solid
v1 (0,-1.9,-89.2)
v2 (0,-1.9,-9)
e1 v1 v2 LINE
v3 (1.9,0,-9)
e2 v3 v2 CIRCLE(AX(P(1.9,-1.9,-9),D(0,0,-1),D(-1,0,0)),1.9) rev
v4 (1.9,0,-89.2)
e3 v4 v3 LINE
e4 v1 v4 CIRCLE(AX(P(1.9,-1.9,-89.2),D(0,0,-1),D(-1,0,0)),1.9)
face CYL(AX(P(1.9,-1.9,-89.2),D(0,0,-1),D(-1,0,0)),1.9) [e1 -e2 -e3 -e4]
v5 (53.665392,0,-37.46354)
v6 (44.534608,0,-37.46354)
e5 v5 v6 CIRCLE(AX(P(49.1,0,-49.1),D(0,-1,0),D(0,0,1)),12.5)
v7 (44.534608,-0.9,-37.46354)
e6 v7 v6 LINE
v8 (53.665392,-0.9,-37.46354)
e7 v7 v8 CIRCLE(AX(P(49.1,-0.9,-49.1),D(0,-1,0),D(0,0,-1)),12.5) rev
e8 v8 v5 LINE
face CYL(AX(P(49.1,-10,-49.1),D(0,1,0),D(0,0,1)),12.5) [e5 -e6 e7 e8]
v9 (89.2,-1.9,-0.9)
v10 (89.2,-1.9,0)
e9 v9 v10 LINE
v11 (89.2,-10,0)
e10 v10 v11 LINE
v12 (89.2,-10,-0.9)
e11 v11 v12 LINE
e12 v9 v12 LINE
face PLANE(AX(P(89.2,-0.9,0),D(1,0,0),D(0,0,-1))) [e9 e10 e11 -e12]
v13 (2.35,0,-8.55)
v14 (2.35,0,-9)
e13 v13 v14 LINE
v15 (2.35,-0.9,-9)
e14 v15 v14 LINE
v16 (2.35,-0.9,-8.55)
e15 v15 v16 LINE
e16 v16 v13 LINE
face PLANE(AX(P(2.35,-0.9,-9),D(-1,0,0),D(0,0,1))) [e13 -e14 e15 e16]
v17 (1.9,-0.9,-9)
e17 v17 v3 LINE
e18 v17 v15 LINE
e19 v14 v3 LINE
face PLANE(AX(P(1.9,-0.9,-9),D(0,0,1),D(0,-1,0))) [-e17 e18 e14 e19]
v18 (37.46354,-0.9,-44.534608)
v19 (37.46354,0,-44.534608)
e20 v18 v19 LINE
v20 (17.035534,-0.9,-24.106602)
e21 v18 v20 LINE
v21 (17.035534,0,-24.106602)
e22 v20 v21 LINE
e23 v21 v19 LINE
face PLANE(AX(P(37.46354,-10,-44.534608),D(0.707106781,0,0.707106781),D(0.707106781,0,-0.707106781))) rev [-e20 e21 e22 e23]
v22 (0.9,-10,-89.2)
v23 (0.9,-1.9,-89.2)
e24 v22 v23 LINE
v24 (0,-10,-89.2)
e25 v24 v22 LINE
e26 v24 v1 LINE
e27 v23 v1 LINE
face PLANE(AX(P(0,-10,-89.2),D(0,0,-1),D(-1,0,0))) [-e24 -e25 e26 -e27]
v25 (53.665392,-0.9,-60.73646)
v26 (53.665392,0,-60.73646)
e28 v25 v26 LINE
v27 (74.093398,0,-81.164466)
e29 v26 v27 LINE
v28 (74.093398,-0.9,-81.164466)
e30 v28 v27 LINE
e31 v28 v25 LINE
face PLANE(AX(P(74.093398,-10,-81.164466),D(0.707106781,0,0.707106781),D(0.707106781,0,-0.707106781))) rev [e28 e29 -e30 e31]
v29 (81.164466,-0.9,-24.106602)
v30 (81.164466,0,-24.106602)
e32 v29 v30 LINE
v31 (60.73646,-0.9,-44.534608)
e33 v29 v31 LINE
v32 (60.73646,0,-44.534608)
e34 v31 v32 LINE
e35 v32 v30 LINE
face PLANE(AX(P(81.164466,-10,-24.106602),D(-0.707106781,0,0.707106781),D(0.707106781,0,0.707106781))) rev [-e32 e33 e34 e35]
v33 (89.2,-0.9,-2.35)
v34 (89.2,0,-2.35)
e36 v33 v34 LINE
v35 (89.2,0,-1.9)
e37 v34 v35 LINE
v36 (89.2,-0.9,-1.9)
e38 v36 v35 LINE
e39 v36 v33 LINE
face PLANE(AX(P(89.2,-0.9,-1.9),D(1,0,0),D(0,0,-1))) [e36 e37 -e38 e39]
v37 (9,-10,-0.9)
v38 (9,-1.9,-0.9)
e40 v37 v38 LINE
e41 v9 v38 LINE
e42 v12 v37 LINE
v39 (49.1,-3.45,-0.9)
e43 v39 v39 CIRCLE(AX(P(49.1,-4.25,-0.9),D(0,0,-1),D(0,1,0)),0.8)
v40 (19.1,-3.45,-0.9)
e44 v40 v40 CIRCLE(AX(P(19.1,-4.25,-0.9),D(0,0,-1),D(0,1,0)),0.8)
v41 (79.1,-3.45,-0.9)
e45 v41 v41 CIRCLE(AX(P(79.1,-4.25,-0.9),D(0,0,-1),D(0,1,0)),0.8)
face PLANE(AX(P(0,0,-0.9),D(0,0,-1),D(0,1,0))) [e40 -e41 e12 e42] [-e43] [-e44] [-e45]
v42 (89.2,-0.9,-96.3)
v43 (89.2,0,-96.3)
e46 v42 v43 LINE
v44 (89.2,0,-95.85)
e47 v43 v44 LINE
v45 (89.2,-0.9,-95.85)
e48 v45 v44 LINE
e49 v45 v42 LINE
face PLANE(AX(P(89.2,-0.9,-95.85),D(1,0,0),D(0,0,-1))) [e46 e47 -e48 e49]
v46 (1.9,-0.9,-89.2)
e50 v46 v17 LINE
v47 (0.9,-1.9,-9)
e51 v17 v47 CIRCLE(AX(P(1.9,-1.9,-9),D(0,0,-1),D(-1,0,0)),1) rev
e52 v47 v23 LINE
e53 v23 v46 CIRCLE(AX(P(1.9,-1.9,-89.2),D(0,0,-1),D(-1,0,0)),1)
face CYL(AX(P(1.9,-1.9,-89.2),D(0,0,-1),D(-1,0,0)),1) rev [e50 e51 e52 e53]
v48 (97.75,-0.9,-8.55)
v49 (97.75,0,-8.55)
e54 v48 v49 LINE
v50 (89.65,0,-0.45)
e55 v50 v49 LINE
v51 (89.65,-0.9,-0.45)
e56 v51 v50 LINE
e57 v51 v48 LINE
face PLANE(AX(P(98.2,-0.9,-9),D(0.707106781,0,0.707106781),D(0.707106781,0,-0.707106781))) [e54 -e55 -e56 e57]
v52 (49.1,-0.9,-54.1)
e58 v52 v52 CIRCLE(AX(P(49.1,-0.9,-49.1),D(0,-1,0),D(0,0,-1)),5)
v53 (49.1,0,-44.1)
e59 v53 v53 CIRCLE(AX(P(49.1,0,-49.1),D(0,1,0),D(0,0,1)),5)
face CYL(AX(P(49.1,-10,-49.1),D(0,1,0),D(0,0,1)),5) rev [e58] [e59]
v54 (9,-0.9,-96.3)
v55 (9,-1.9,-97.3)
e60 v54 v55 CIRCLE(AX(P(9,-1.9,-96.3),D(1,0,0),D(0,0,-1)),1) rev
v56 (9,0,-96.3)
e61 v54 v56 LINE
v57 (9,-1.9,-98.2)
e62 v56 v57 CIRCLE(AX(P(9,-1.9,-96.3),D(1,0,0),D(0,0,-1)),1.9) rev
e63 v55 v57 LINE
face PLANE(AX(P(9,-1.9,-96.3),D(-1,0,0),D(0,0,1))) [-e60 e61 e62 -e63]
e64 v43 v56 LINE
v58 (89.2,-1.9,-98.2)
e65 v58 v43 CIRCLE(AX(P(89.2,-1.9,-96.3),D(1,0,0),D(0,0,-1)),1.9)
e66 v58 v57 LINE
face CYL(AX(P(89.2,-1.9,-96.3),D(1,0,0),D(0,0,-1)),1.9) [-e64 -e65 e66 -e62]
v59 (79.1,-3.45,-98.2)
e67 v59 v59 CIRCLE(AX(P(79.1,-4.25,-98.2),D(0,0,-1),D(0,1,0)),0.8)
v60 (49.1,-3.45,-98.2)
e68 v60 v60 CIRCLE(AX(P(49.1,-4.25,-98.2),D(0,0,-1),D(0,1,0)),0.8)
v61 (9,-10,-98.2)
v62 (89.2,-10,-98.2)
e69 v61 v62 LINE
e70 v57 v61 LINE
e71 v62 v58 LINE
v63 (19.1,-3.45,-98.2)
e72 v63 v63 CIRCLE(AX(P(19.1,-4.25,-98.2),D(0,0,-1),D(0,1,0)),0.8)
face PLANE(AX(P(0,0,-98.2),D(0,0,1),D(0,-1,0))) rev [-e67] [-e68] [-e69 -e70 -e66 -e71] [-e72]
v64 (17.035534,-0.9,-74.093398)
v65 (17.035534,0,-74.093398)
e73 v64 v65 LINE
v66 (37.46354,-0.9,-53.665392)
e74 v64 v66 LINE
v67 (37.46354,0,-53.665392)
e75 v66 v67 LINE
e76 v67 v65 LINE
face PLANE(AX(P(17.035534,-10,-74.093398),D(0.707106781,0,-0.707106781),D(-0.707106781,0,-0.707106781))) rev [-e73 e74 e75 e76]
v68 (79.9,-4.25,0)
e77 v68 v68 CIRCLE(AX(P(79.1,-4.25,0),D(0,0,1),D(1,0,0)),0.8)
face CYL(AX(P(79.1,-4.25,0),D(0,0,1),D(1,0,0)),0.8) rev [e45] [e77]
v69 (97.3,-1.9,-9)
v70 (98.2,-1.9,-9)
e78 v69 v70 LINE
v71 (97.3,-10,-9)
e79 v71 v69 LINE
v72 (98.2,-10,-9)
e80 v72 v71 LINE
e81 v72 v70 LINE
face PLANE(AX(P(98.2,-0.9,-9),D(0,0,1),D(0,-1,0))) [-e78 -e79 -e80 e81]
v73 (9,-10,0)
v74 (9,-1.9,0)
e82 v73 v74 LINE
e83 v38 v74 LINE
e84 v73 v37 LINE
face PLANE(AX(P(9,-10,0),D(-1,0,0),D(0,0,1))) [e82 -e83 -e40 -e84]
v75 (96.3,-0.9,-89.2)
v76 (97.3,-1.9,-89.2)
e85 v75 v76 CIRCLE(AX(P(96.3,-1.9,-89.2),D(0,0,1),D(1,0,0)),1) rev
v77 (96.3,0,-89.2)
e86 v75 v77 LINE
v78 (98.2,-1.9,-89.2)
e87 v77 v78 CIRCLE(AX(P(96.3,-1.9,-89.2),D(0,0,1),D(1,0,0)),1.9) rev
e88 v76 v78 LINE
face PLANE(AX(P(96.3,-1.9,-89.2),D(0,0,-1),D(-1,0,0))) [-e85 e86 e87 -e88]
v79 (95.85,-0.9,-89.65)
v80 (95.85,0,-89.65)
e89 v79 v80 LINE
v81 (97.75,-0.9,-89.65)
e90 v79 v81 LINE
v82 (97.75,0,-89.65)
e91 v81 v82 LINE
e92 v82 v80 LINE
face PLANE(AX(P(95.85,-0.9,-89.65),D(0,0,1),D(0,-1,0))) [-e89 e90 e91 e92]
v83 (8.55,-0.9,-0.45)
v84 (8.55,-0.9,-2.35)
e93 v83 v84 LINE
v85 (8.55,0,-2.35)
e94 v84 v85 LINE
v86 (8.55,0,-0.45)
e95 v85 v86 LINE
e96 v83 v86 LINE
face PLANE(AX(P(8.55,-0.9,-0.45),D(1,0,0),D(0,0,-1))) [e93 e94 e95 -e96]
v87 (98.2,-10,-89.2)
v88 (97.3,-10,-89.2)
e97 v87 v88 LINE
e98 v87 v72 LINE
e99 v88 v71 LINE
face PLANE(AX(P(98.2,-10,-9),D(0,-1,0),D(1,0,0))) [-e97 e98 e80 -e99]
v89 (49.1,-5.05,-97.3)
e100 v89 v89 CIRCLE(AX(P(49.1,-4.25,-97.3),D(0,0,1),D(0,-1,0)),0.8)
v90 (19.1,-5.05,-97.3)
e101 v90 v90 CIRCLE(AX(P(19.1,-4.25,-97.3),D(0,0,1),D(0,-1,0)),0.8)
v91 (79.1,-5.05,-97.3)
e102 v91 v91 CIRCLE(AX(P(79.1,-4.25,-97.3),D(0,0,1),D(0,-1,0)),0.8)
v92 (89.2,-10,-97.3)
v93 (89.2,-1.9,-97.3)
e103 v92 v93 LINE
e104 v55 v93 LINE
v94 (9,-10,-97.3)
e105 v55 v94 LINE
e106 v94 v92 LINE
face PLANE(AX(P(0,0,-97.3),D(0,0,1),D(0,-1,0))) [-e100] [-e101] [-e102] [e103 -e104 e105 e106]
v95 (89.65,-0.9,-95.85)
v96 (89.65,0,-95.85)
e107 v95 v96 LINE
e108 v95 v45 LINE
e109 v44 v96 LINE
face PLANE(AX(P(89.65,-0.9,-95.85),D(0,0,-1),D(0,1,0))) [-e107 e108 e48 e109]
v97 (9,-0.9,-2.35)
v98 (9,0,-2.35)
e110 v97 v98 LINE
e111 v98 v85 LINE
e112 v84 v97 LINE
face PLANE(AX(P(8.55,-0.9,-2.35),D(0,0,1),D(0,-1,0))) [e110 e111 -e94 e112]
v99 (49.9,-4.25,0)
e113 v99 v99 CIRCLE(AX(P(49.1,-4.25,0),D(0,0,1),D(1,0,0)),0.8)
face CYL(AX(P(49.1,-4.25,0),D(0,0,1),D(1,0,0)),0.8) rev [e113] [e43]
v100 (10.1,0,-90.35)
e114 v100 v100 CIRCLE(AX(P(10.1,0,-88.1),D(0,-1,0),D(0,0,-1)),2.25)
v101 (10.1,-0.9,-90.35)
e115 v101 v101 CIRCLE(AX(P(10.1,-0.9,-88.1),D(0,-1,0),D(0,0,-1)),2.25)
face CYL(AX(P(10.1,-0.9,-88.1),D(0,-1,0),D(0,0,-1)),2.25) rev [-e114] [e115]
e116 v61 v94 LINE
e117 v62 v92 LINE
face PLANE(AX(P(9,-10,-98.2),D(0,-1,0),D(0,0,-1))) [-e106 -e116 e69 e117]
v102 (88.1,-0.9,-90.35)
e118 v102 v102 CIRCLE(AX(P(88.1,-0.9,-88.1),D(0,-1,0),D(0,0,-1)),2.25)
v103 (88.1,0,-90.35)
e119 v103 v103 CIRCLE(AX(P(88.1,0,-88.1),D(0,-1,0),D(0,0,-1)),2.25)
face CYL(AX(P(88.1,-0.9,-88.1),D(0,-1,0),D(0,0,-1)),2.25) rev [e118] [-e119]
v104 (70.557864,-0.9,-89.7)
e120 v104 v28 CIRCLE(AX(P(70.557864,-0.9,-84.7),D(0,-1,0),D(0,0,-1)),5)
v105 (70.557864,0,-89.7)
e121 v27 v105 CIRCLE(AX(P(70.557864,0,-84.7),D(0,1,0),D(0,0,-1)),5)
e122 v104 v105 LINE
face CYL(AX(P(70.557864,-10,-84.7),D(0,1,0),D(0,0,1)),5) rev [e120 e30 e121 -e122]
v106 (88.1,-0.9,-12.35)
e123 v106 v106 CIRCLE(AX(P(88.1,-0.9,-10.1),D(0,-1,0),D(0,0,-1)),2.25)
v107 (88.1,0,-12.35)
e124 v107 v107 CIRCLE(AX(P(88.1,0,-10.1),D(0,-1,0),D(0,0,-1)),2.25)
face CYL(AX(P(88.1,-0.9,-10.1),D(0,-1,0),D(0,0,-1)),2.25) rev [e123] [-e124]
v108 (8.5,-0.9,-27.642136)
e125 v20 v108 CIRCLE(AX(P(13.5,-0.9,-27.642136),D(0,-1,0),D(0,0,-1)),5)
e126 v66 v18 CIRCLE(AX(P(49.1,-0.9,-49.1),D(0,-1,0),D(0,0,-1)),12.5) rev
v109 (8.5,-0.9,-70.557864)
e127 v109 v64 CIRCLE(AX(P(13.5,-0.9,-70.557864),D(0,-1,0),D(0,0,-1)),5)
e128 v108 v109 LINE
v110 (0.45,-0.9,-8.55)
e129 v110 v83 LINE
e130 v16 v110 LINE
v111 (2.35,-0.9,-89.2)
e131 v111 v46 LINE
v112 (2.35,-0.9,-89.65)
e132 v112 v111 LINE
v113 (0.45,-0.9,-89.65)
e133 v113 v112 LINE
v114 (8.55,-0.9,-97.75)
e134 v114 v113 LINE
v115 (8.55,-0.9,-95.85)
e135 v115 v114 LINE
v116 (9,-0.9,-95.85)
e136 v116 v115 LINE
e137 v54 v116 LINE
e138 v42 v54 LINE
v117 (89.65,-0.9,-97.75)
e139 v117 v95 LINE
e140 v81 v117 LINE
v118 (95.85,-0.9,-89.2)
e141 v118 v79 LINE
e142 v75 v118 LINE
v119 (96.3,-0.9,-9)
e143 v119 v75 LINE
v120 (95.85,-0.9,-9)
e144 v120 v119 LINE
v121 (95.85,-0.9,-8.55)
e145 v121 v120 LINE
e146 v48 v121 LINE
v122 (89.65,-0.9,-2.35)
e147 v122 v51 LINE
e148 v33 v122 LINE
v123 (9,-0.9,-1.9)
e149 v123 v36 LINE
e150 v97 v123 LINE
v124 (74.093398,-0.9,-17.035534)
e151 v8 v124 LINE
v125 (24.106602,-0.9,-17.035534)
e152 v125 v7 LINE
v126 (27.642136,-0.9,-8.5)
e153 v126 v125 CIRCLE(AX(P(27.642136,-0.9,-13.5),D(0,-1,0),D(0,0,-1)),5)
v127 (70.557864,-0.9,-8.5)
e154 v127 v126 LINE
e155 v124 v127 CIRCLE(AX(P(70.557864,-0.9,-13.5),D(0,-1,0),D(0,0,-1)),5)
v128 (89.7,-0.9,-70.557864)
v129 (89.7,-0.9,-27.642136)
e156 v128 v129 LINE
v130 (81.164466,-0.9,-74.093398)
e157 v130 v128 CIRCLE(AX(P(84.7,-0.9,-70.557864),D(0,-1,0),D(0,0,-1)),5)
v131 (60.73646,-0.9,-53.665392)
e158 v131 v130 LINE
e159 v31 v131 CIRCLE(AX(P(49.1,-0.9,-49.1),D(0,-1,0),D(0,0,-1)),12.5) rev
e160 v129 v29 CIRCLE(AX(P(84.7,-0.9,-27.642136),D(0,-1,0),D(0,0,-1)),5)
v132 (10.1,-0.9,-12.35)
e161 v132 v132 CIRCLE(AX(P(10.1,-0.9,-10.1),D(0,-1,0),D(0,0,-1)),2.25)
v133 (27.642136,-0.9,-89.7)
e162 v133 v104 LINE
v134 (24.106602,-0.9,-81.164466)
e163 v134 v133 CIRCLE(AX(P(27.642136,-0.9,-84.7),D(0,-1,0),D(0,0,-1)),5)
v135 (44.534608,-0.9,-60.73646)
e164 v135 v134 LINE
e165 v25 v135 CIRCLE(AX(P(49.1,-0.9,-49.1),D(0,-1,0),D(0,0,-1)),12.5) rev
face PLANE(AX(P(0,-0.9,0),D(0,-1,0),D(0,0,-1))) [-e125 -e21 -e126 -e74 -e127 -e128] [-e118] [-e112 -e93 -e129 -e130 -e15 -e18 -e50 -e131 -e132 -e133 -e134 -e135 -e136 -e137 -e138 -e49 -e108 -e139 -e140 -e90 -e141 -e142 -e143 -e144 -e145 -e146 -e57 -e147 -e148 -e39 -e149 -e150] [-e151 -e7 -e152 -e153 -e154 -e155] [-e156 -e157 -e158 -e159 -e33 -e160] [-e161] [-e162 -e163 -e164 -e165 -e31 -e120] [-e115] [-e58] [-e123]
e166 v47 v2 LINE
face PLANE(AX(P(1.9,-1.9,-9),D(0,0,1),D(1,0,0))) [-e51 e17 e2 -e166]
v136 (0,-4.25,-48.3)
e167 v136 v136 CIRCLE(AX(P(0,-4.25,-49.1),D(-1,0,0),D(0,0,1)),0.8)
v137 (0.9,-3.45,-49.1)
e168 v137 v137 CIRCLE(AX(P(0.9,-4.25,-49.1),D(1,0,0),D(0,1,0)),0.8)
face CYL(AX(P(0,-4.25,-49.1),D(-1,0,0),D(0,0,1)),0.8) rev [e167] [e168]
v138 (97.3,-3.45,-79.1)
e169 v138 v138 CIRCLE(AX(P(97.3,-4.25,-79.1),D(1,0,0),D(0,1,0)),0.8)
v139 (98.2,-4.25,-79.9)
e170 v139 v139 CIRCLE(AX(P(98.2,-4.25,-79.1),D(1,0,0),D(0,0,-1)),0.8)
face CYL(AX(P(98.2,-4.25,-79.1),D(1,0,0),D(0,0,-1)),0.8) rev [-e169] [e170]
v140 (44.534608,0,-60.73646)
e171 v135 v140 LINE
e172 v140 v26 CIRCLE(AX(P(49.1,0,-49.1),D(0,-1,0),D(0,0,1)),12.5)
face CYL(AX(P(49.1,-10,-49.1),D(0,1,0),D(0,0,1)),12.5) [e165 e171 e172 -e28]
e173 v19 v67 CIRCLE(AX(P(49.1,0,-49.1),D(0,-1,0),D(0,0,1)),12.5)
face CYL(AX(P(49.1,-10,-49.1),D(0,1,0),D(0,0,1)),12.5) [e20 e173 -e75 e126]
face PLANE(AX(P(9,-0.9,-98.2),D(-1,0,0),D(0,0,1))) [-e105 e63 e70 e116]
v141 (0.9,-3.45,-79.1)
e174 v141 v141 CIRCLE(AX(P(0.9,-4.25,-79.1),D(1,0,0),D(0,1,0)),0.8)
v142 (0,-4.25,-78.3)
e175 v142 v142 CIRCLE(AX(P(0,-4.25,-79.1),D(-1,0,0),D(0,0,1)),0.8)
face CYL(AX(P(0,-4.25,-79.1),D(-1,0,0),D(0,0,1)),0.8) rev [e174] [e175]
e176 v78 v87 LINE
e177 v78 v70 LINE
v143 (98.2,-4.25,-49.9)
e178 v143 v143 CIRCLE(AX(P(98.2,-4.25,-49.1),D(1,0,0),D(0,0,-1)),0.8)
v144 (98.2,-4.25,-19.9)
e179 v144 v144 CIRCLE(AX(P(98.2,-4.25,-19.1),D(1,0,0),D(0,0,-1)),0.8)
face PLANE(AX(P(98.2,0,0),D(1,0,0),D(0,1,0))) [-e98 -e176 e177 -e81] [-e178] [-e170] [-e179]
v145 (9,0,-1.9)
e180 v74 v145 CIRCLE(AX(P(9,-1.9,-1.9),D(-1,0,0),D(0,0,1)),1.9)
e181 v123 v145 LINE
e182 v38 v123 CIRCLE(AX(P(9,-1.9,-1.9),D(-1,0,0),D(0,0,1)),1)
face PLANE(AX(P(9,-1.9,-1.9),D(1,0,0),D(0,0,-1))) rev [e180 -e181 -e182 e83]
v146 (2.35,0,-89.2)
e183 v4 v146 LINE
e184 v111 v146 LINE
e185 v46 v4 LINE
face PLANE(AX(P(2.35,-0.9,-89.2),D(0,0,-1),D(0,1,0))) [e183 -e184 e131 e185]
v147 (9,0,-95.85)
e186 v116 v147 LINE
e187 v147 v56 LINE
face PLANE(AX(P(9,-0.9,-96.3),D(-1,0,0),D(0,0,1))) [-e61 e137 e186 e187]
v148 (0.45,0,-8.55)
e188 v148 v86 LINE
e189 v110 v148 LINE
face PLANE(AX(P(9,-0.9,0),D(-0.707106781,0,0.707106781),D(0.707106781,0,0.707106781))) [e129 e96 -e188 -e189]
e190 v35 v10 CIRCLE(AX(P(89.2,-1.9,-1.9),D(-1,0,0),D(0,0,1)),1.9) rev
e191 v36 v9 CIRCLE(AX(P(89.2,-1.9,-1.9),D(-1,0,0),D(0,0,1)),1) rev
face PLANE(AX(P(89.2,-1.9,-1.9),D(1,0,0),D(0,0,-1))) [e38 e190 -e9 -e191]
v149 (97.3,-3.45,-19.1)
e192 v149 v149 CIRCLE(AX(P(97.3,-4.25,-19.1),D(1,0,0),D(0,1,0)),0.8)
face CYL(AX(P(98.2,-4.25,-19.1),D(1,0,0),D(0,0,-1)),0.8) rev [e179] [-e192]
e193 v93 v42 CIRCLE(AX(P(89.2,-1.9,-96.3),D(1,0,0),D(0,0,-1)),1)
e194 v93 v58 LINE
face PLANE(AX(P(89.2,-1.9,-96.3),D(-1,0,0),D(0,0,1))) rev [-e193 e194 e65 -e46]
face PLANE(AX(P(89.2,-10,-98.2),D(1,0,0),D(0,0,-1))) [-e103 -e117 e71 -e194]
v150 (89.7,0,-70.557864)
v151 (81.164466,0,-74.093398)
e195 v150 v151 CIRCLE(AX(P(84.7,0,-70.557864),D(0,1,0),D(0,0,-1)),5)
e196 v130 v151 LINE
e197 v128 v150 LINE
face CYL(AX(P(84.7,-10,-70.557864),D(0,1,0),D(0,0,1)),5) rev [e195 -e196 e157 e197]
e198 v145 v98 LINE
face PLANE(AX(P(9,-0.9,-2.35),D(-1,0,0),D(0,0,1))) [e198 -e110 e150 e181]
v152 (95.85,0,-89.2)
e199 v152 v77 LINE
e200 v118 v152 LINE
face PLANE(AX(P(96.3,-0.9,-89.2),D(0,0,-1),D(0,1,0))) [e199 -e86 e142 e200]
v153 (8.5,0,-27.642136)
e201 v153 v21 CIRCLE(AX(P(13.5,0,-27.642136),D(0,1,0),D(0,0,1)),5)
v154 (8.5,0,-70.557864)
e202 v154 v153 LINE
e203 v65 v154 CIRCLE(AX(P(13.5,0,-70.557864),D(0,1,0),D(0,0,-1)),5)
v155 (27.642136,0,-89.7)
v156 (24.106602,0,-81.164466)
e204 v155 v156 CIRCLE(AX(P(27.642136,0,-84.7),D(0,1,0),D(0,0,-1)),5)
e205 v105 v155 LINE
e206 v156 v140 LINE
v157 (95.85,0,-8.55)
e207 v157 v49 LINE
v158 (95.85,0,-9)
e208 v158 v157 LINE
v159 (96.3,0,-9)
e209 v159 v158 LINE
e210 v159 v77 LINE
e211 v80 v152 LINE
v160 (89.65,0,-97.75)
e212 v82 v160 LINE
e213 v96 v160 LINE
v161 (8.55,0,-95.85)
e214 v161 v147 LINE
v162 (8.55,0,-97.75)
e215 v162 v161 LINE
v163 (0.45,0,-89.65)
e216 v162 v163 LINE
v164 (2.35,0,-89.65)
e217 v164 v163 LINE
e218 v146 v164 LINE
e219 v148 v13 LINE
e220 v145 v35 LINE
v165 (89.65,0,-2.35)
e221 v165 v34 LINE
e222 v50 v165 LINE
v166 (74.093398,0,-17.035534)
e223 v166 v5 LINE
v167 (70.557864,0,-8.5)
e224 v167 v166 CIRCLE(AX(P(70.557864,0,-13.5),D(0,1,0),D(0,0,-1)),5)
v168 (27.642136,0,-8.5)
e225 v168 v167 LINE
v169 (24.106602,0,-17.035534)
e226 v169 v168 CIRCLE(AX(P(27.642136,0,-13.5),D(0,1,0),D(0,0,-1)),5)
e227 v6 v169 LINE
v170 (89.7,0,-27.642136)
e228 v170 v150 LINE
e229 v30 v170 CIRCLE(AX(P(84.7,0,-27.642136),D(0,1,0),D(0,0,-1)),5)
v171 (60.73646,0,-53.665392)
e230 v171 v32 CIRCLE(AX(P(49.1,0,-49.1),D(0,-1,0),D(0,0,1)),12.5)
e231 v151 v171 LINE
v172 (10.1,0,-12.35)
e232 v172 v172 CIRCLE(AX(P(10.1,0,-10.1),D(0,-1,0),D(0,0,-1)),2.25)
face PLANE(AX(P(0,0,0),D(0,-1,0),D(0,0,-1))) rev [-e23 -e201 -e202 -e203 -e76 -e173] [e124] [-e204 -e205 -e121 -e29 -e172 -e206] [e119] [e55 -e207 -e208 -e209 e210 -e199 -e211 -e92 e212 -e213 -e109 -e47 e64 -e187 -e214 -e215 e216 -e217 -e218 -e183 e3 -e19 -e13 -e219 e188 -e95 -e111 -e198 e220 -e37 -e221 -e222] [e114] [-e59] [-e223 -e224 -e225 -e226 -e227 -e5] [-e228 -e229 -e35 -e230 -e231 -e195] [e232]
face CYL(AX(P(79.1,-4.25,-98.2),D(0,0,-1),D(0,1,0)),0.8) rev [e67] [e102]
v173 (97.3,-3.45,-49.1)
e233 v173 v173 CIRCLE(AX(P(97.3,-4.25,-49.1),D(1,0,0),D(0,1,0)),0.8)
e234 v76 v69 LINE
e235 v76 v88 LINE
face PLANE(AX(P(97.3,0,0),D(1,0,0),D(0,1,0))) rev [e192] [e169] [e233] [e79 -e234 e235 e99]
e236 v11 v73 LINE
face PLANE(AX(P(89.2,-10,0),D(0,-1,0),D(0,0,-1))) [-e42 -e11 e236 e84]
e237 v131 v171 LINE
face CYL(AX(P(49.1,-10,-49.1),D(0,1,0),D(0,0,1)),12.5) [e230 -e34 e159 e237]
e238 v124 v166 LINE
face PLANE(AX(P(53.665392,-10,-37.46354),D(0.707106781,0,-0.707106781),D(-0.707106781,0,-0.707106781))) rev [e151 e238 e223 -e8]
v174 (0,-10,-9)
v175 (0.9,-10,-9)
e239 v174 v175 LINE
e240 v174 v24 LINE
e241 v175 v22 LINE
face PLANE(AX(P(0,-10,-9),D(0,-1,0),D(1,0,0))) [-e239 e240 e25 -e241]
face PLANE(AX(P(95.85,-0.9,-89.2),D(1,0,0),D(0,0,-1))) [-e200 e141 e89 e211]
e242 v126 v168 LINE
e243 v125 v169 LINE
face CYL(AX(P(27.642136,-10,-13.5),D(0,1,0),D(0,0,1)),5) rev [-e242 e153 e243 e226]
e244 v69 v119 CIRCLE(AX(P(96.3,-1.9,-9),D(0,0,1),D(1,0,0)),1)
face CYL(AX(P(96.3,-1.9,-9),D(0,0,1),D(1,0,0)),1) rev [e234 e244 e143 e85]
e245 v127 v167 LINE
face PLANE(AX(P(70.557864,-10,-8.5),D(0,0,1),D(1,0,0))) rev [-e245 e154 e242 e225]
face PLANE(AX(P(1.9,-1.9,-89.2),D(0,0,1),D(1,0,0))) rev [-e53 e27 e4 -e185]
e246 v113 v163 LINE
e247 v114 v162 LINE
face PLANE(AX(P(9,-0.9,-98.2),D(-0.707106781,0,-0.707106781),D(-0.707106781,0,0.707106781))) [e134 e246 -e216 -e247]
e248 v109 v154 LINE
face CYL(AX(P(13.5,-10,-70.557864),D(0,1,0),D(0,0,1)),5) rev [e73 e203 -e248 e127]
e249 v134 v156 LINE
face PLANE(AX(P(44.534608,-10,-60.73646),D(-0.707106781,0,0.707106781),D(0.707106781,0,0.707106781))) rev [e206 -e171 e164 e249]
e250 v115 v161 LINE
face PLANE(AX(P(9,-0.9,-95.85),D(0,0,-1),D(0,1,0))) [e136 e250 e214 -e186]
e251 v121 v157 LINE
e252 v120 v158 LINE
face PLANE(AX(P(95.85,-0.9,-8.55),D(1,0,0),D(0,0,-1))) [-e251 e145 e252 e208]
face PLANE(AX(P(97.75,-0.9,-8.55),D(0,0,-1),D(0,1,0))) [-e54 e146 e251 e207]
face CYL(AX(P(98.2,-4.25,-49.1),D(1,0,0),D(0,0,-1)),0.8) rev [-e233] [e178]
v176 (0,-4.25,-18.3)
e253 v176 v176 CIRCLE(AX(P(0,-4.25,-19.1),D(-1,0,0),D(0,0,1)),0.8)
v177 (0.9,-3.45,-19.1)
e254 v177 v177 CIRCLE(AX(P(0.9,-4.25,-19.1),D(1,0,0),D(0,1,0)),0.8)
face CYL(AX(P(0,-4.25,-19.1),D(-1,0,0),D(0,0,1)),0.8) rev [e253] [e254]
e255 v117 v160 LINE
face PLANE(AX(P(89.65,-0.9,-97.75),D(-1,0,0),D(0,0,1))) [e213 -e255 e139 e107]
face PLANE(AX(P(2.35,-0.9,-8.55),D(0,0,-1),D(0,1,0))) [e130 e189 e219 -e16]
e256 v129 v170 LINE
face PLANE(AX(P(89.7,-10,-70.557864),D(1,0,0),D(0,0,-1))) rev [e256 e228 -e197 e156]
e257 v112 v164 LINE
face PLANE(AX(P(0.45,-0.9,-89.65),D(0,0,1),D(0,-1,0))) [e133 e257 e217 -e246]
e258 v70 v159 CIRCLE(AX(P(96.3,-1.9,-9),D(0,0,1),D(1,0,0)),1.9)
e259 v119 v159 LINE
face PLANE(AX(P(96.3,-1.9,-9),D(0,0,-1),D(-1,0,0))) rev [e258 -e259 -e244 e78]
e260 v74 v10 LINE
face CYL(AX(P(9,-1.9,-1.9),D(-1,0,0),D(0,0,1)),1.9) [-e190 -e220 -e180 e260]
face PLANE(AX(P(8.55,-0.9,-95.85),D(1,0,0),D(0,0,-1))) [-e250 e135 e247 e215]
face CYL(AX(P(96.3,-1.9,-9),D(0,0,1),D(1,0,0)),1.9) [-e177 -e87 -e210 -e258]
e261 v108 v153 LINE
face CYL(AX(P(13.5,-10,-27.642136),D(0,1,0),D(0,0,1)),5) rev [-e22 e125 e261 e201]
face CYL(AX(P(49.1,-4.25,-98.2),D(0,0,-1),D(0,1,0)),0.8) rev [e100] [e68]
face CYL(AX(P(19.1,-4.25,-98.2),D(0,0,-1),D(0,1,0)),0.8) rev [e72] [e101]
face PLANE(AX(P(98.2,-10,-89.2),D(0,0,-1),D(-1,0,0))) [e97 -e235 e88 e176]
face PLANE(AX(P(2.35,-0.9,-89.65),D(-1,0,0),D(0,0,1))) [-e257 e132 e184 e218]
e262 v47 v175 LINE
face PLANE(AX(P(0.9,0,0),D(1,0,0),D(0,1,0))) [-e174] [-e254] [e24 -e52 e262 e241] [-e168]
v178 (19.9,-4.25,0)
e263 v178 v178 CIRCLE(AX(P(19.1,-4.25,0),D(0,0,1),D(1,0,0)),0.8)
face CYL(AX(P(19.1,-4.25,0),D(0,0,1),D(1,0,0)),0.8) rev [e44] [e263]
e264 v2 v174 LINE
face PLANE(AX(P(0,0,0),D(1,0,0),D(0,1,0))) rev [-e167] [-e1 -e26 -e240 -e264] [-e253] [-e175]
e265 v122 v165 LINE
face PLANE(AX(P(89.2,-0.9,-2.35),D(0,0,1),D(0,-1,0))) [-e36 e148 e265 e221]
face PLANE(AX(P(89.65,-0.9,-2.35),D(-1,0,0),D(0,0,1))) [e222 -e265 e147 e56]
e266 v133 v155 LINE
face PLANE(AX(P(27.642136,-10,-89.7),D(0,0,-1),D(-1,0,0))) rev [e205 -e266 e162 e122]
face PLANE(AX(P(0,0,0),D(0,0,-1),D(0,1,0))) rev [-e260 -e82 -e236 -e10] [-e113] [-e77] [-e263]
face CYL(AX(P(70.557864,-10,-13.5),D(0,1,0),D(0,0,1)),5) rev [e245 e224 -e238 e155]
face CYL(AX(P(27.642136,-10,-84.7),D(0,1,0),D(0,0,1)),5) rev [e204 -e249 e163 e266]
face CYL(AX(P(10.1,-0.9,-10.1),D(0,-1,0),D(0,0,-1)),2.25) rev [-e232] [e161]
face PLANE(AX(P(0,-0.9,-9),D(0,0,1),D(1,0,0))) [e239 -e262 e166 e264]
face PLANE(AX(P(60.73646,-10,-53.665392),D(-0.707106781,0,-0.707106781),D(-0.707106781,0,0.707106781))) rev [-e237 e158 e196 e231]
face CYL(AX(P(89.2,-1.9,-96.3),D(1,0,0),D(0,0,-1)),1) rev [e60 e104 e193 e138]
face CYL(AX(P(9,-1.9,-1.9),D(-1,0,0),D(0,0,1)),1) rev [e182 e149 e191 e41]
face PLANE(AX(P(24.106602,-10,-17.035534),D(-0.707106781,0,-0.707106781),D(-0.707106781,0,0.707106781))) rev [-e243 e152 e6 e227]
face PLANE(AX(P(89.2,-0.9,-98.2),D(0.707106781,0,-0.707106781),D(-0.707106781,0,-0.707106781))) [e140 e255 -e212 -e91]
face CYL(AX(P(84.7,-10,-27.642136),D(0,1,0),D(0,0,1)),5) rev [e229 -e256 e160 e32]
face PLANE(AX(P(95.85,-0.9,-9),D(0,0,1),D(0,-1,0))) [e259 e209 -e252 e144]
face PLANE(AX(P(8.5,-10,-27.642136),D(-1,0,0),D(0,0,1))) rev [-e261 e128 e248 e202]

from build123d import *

# Parameters (mm, degrees)
BASE_FLANGE1_START              = -0.9
BASE_FLANGE1_DEPTH              = 0.9
EDGE_FLANGE1_STRIP_W            = 5.6
EDGE_FLANGE1_STRIP_H            = 0.9
EDGE_FLANGE1_STRIP_CUT_DEPTH    = 80.2
EDGE_FLANGE1_RELIEF_W           = 6.05
EDGE_FLANGE1_RELIEF_H           = 0.45
EDGE_FLANGE1_RELIEF_CUT_DEPTH   = 0.9
EDGE_FLANGE1_STRIP_2_W          = 5.6
EDGE_FLANGE1_STRIP_2_H          = 0.9
EDGE_FLANGE1_STRIP_CUT_2_DEPTH  = 80.2
EDGE_FLANGE1_RELIEF_2_W         = 6.05
EDGE_FLANGE1_RELIEF_2_H         = 0.45
EDGE_FLANGE1_RELIEF_CUT_2_DEPTH = 0.9
EDGE_FLANGE1_STRIP_3_W          = 5.6
EDGE_FLANGE1_STRIP_3_H          = 0.9
EDGE_FLANGE1_STRIP_CUT_3_DEPTH  = 80.2
EDGE_FLANGE1_RELIEF_3_W         = 6.05
EDGE_FLANGE1_RELIEF_3_H         = 0.45
EDGE_FLANGE1_RELIEF_CUT_3_DEPTH = 0.9
EDGE_FLANGE1_STRIP_4_W          = 5.6
EDGE_FLANGE1_STRIP_4_H          = 0.9
EDGE_FLANGE1_STRIP_CUT_4_DEPTH  = 80.2
EDGE_FLANGE1_RELIEF_4_W         = 6.05
EDGE_FLANGE1_RELIEF_4_H         = 0.45
EDGE_FLANGE1_RELIEF_CUT_4_DEPTH = 0.9
EDGE_FLANGE1_DEPTH              = 80.2
EDGE_FLANGE1_BEND_DEPTH         = 80.2
EDGE_FLANGE1_BEND_2_DEPTH       = 80.2
EDGE_FLANGE1_BEND_3_DEPTH       = 80.2
SKETCH18_R                      = 5
CUT_EXTRUDE1_DEPTH              = 10
M2X0_4_TAPPED_HOLE1_D           = 1.6
M2X0_4_TAPPED_HOLE1_DEPTH       = 5.2
M2X0_4_TAPPED_HOLE1_TIP         = 0.480688495
M2X0_4_TAPPED_HOLE2_D           = 1.6
M2X0_4_TAPPED_HOLE2_DEPTH       = 5.2
M2X0_4_TAPPED_HOLE2_TIP         = 0.480688495
M2X0_4_TAPPED_HOLE3_D           = 1.6
M2X0_4_TAPPED_HOLE3_DEPTH       = 5.2
M2X0_4_TAPPED_HOLE3_TIP         = 0.480688495
M2X0_4_TAPPED_HOLE4_D           = 1.6
M2X0_4_TAPPED_HOLE4_DEPTH       = 5.2
M2X0_4_TAPPED_HOLE4_TIP         = 0.480688495
M4_CLEARANCE_HOLE1_D            = 4.5


# Read off the part's stored shape, not the designer's step: Base-Flange1
# Sheet-metal steps are written as plain solids
with BuildPart() as part:
    # Base-Flange1 outline → Base-Flange1 (new body)
    with BuildSketch(Plane(origin=(0, 0, 0), x_dir=(1, 0, 0), z_dir=(0, 1, 0)).offset(BASE_FLANGE1_START)):
        Polygon((98.2, 89.2), (89.2, 98.2), (9, 98.2), (0, 89.2), (0, 9), (9, 0), (89.2, 0), (98.2, 9), align=None)
    extrude(amount=BASE_FLANGE1_DEPTH)

    # Edge-Flange1 strip (across the edge) → Edge-Flange1 strip cut (cut)
    with BuildSketch(Plane(origin=(98.2, -0.9, -89.2), x_dir=(-1, 0, 0), z_dir=(0, 0, 1))):
        with Locations((-0.9, -0.45)):
            Rectangle(EDGE_FLANGE1_STRIP_W, EDGE_FLANGE1_STRIP_H)
    extrude(amount=EDGE_FLANGE1_STRIP_CUT_DEPTH, mode=Mode.SUBTRACT)

    # Edge-Flange1 relief (on the sheet) → Edge-Flange1 relief cut (cut)
    with BuildSketch(Plane(origin=(96.3, -0.9, -89.2), x_dir=(-1, 0, 0), z_dir=(0, -1, 0))):
        with Locations((-2.575, 0.225)):
            Rectangle(EDGE_FLANGE1_RELIEF_W, EDGE_FLANGE1_RELIEF_H)
        with Locations((-2.575, -80.425)):
            Rectangle(EDGE_FLANGE1_RELIEF_W, EDGE_FLANGE1_RELIEF_H)
    extrude(amount=-EDGE_FLANGE1_RELIEF_CUT_DEPTH, mode=Mode.SUBTRACT)

    # Edge-Flange1 strip 2 (across the edge) → Edge-Flange1 strip cut 2 (cut)
    with BuildSketch(Plane(origin=(89.2, -0.9, 0), x_dir=(0, 0, -1), z_dir=(-1, 0, 0))):
        with Locations((-0.9, -0.45)):
            Rectangle(EDGE_FLANGE1_STRIP_2_W, EDGE_FLANGE1_STRIP_2_H)
    extrude(amount=EDGE_FLANGE1_STRIP_CUT_2_DEPTH, mode=Mode.SUBTRACT)

    # Edge-Flange1 relief 2 (on the sheet) → Edge-Flange1 relief cut 2 (cut)
    with BuildSketch(Plane(origin=(89.2, -0.9, -1.9), x_dir=(0, 0, -1), z_dir=(0, -1, 0))):
        with Locations((-2.575, 0.225)):
            Rectangle(EDGE_FLANGE1_RELIEF_2_W, EDGE_FLANGE1_RELIEF_2_H)
        with Locations((-2.575, -80.425)):
            Rectangle(EDGE_FLANGE1_RELIEF_2_W, EDGE_FLANGE1_RELIEF_2_H)
    extrude(amount=-EDGE_FLANGE1_RELIEF_CUT_2_DEPTH, mode=Mode.SUBTRACT)

    # Edge-Flange1 strip 3 (across the edge) → Edge-Flange1 strip cut 3 (cut)
    with BuildSketch(Plane(origin=(0, -0.9, -9), x_dir=(1, 0, 0), z_dir=(0, 0, -1))):
        with Locations((-0.9, -0.45)):
            Rectangle(EDGE_FLANGE1_STRIP_3_W, EDGE_FLANGE1_STRIP_3_H)
    extrude(amount=EDGE_FLANGE1_STRIP_CUT_3_DEPTH, mode=Mode.SUBTRACT)

    # Edge-Flange1 relief 3 (on the sheet) → Edge-Flange1 relief cut 3 (cut)
    with BuildSketch(Plane(origin=(1.9, -0.9, -9), x_dir=(1, 0, 0), z_dir=(0, -1, 0))):
        with Locations((-2.575, 0.225)):
            Rectangle(EDGE_FLANGE1_RELIEF_3_W, EDGE_FLANGE1_RELIEF_3_H)
        with Locations((-2.575, -80.425)):
            Rectangle(EDGE_FLANGE1_RELIEF_3_W, EDGE_FLANGE1_RELIEF_3_H)
    extrude(amount=-EDGE_FLANGE1_RELIEF_CUT_3_DEPTH, mode=Mode.SUBTRACT)

    # Edge-Flange1 strip 4 (across the edge) → Edge-Flange1 strip cut 4 (cut)
    with BuildSketch(Plane(origin=(9, -0.9, -98.2), x_dir=(0, 0, 1), z_dir=(1, 0, 0))):
        with Locations((-0.9, -0.45)):
            Rectangle(EDGE_FLANGE1_STRIP_4_W, EDGE_FLANGE1_STRIP_4_H)
    extrude(amount=EDGE_FLANGE1_STRIP_CUT_4_DEPTH, mode=Mode.SUBTRACT)

    # Edge-Flange1 relief 4 (on the sheet) → Edge-Flange1 relief cut 4 (cut)
    with BuildSketch(Plane(origin=(9, -0.9, -96.3), x_dir=(0, 0, 1), z_dir=(0, -1, 0))):
        with Locations((-2.575, 0.225)):
            Rectangle(EDGE_FLANGE1_RELIEF_4_W, EDGE_FLANGE1_RELIEF_4_H)
        with Locations((-2.575, -80.425)):
            Rectangle(EDGE_FLANGE1_RELIEF_4_W, EDGE_FLANGE1_RELIEF_4_H)
    extrude(amount=-EDGE_FLANGE1_RELIEF_CUT_4_DEPTH, mode=Mode.SUBTRACT)

    # Edge-Flange1 section (across the edge) → Edge-Flange1 (add)
    with BuildSketch(Plane(origin=(98.2, -0.9, -89.2), x_dir=(-1, 0, 0), z_dir=(0, 0, 1))):
        with BuildLine():
            Line((0, 1), (0, 9.1))
            Line((0, 9.1), (0.9, 9.1))
            Line((0.9, 9.1), (0.9, 1))
            ThreePointArc((0.9, 1), (1.192893219, 0.292893219), (1.9, 0))
            Line((1.9, 0), (1.9, -0.9))
            ThreePointArc((1.9, -0.9), (0.556497116, -0.343502884), (0, 1))
        make_face()
    extrude(amount=EDGE_FLANGE1_DEPTH)

    # Edge-Flange1 section 2 (across the edge) → Edge-Flange1 bend (add)
    with BuildSketch(Plane(origin=(89.2, -0.9, 0), x_dir=(0, 0, -1), z_dir=(-1, 0, 0))):
        with BuildLine():
            Line((0, 1), (0, 9.1))
            Line((0, 9.1), (0.9, 9.1))
            Line((0.9, 9.1), (0.9, 1))
            ThreePointArc((0.9, 1), (1.192893219, 0.292893219), (1.9, 0))
            Line((1.9, 0), (1.9, -0.9))
            ThreePointArc((1.9, -0.9), (0.556497116, -0.343502884), (0, 1))
        make_face()
    extrude(amount=EDGE_FLANGE1_BEND_DEPTH)

    # Edge-Flange1 section 3 (across the edge) → Edge-Flange1 bend 2 (add)
    with BuildSketch(Plane(origin=(0, -0.9, -9), x_dir=(1, 0, 0), z_dir=(0, 0, -1))):
        with BuildLine():
            Line((0, 1), (0, 9.1))
            Line((0, 9.1), (0.9, 9.1))
            Line((0.9, 9.1), (0.9, 1))
            ThreePointArc((0.9, 1), (1.192893219, 0.292893219), (1.9, 0))
            Line((1.9, 0), (1.9, -0.9))
            ThreePointArc((1.9, -0.9), (0.556497116, -0.343502884), (0, 1))
        make_face()
    extrude(amount=EDGE_FLANGE1_BEND_2_DEPTH)

    # Edge-Flange1 section 4 (across the edge) → Edge-Flange1 bend 3 (add)
    with BuildSketch(Plane(origin=(9, -0.9, -98.2), x_dir=(0, 0, 1), z_dir=(1, 0, 0))):
        with BuildLine():
            Line((0, 1), (0, 9.1))
            Line((0, 9.1), (0.9, 9.1))
            Line((0.9, 9.1), (0.9, 1))
            ThreePointArc((0.9, 1), (1.192893219, 0.292893219), (1.9, 0))
            Line((1.9, 0), (1.9, -0.9))
            ThreePointArc((1.9, -0.9), (0.556497116, -0.343502884), (0, 1))
        make_face()
    extrude(amount=EDGE_FLANGE1_BEND_3_DEPTH)

    # Sketch18 → Cut-Extrude1 (cut)
    with BuildSketch(Plane(origin=(0, 0, 0), x_dir=(1, 0, 0), z_dir=(0, 1, 0))):
        with Locations(Location((49.1, 49.1, 0), (0, 0, 270))):
            Circle(SKETCH18_R)
        with BuildLine():
            Line((70.557864376, 8.5), (27.642135624, 8.5))
            ThreePointArc((27.642135624, 8.5), (23.022737961, 11.586582838), (24.106601718, 17.035533906))
            Line((24.106601718, 17.035533906), (44.534608033, 37.463540221))
            ThreePointArc((44.534608033, 37.463540221), (49.1, 36.6), (53.665391967, 37.463540221))
            Line((53.665391967, 37.463540221), (74.093398282, 17.035533906))
            ThreePointArc((74.093398282, 17.035533906), (75.177262039, 11.586582838), (70.557864376, 8.5))
        make_face()
        with BuildLine():
            Line((8.5, 27.642135624), (8.5, 70.557864376))
            ThreePointArc((8.5, 70.557864376), (11.586582838, 75.177262039), (17.035533906, 74.093398282))
            Line((17.035533906, 74.093398282), (37.463540221, 53.665391967))
            ThreePointArc((37.463540221, 53.665391967), (36.6, 49.1), (37.463540221, 44.534608033))
            Line((37.463540221, 44.534608033), (17.035533906, 24.106601718))
            ThreePointArc((17.035533906, 24.106601718), (11.586582838, 23.022737961), (8.5, 27.642135624))
        make_face()
        with BuildLine():
            Line((27.642135624, 89.7), (70.557864376, 89.7))
            ThreePointArc((70.557864376, 89.7), (75.177262039, 86.613417162), (74.093398282, 81.164466094))
            Line((74.093398282, 81.164466094), (53.665391967, 60.736459779))
            ThreePointArc((53.665391967, 60.736459779), (49.1, 61.6), (44.534608033, 60.736459779))
            Line((44.534608033, 60.736459779), (24.106601718, 81.164466094))
            ThreePointArc((24.106601718, 81.164466094), (23.022737961, 86.613417162), (27.642135624, 89.7))
        make_face()
        with BuildLine():
            Line((89.7, 70.557864376), (89.7, 27.642135624))
            ThreePointArc((89.7, 27.642135624), (86.613417162, 23.022737961), (81.164466094, 24.106601718))
            Line((81.164466094, 24.106601718), (60.736459779, 44.534608033))
            ThreePointArc((60.736459779, 44.534608033), (61.6, 49.1), (60.736459779, 53.665391967))
            Line((60.736459779, 53.665391967), (81.164466094, 74.093398282))
            ThreePointArc((81.164466094, 74.093398282), (86.613417162, 75.177262039), (89.7, 70.557864376))
        make_face()
    extrude(amount=-CUT_EXTRUDE1_DEPTH, mode=Mode.SUBTRACT)

    # M2x0.4 Tapped Hole1
    with Locations(Plane(origin=(98.2, -86.276184469, 4.184287404), x_dir=(0, 0, 1), z_dir=(1, 0, 0))):
        with Locations((-83.284287404, -82.026184469), (-53.284287404, -82.026184469), (-23.284287404, -82.026184469)):
            Hole(M2X0_4_TAPPED_HOLE1_D / 2, depth=M2X0_4_TAPPED_HOLE1_DEPTH)
            with Locations((0, 0, -(M2X0_4_TAPPED_HOLE1_DEPTH + M2X0_4_TAPPED_HOLE1_TIP / 2))):  # 118° drill point
                Cone(0, M2X0_4_TAPPED_HOLE1_D / 2, M2X0_4_TAPPED_HOLE1_TIP, mode=Mode.SUBTRACT)

    # M2x0.4 Tapped Hole2
    with Locations(Plane(origin=(24.191898312, -86.276184469, -98.2), x_dir=(1, 0, 0), z_dir=(0, 0, -1))):
        with Locations((-5.091898312, -82.026184469), (24.908101688, -82.026184469), (54.908101688, -82.026184469)):
            Hole(M2X0_4_TAPPED_HOLE2_D / 2, depth=M2X0_4_TAPPED_HOLE2_DEPTH)
            with Locations((0, 0, -(M2X0_4_TAPPED_HOLE2_DEPTH + M2X0_4_TAPPED_HOLE2_TIP / 2))):  # 118° drill point
                Cone(0, M2X0_4_TAPPED_HOLE2_D / 2, M2X0_4_TAPPED_HOLE2_TIP, mode=Mode.SUBTRACT)

    # M2x0.4 Tapped Hole3
    with Locations(Plane(origin=(0, -86.276184469, 4.184287404), x_dir=(0, 0, -1), z_dir=(-1, 0, 0))):
        with Locations((83.284287404, -82.026184469), (53.284287404, -82.026184469), (23.284287404, -82.026184469)):
            Hole(M2X0_4_TAPPED_HOLE3_D / 2, depth=M2X0_4_TAPPED_HOLE3_DEPTH)
            with Locations((0, 0, -(M2X0_4_TAPPED_HOLE3_DEPTH + M2X0_4_TAPPED_HOLE3_TIP / 2))):  # 118° drill point
                Cone(0, M2X0_4_TAPPED_HOLE3_D / 2, M2X0_4_TAPPED_HOLE3_TIP, mode=Mode.SUBTRACT)

    # M2x0.4 Tapped Hole4
    with Locations(Plane(origin=(24.191898312, -86.276184469, 0), x_dir=(-1, 0, 0), z_dir=(0, 0, 1))):
        with Locations((-24.908101688, -82.026184469), (5.091898312, -82.026184469), (-54.908101688, -82.026184469)):
            Hole(M2X0_4_TAPPED_HOLE4_D / 2, depth=M2X0_4_TAPPED_HOLE4_DEPTH)
            with Locations((0, 0, -(M2X0_4_TAPPED_HOLE4_DEPTH + M2X0_4_TAPPED_HOLE4_TIP / 2))):  # 118° drill point
                Cone(0, M2X0_4_TAPPED_HOLE4_D / 2, M2X0_4_TAPPED_HOLE4_TIP, mode=Mode.SUBTRACT)

    # M4 Clearance Hole1 (through all)
    with Locations(Plane(origin=(24.191898312, -0.9, 4.184287404), x_dir=(0, 0, 1), z_dir=(0, -1, 0))):
        with Locations((-92.284287404, 14.091898312), (-92.284287404, -63.908101688), (-14.284287404, -63.908101688), (-14.284287404, 14.091898312)):
            Hole(M4_CLEARANCE_HOLE1_D / 2)


solid = part.part
